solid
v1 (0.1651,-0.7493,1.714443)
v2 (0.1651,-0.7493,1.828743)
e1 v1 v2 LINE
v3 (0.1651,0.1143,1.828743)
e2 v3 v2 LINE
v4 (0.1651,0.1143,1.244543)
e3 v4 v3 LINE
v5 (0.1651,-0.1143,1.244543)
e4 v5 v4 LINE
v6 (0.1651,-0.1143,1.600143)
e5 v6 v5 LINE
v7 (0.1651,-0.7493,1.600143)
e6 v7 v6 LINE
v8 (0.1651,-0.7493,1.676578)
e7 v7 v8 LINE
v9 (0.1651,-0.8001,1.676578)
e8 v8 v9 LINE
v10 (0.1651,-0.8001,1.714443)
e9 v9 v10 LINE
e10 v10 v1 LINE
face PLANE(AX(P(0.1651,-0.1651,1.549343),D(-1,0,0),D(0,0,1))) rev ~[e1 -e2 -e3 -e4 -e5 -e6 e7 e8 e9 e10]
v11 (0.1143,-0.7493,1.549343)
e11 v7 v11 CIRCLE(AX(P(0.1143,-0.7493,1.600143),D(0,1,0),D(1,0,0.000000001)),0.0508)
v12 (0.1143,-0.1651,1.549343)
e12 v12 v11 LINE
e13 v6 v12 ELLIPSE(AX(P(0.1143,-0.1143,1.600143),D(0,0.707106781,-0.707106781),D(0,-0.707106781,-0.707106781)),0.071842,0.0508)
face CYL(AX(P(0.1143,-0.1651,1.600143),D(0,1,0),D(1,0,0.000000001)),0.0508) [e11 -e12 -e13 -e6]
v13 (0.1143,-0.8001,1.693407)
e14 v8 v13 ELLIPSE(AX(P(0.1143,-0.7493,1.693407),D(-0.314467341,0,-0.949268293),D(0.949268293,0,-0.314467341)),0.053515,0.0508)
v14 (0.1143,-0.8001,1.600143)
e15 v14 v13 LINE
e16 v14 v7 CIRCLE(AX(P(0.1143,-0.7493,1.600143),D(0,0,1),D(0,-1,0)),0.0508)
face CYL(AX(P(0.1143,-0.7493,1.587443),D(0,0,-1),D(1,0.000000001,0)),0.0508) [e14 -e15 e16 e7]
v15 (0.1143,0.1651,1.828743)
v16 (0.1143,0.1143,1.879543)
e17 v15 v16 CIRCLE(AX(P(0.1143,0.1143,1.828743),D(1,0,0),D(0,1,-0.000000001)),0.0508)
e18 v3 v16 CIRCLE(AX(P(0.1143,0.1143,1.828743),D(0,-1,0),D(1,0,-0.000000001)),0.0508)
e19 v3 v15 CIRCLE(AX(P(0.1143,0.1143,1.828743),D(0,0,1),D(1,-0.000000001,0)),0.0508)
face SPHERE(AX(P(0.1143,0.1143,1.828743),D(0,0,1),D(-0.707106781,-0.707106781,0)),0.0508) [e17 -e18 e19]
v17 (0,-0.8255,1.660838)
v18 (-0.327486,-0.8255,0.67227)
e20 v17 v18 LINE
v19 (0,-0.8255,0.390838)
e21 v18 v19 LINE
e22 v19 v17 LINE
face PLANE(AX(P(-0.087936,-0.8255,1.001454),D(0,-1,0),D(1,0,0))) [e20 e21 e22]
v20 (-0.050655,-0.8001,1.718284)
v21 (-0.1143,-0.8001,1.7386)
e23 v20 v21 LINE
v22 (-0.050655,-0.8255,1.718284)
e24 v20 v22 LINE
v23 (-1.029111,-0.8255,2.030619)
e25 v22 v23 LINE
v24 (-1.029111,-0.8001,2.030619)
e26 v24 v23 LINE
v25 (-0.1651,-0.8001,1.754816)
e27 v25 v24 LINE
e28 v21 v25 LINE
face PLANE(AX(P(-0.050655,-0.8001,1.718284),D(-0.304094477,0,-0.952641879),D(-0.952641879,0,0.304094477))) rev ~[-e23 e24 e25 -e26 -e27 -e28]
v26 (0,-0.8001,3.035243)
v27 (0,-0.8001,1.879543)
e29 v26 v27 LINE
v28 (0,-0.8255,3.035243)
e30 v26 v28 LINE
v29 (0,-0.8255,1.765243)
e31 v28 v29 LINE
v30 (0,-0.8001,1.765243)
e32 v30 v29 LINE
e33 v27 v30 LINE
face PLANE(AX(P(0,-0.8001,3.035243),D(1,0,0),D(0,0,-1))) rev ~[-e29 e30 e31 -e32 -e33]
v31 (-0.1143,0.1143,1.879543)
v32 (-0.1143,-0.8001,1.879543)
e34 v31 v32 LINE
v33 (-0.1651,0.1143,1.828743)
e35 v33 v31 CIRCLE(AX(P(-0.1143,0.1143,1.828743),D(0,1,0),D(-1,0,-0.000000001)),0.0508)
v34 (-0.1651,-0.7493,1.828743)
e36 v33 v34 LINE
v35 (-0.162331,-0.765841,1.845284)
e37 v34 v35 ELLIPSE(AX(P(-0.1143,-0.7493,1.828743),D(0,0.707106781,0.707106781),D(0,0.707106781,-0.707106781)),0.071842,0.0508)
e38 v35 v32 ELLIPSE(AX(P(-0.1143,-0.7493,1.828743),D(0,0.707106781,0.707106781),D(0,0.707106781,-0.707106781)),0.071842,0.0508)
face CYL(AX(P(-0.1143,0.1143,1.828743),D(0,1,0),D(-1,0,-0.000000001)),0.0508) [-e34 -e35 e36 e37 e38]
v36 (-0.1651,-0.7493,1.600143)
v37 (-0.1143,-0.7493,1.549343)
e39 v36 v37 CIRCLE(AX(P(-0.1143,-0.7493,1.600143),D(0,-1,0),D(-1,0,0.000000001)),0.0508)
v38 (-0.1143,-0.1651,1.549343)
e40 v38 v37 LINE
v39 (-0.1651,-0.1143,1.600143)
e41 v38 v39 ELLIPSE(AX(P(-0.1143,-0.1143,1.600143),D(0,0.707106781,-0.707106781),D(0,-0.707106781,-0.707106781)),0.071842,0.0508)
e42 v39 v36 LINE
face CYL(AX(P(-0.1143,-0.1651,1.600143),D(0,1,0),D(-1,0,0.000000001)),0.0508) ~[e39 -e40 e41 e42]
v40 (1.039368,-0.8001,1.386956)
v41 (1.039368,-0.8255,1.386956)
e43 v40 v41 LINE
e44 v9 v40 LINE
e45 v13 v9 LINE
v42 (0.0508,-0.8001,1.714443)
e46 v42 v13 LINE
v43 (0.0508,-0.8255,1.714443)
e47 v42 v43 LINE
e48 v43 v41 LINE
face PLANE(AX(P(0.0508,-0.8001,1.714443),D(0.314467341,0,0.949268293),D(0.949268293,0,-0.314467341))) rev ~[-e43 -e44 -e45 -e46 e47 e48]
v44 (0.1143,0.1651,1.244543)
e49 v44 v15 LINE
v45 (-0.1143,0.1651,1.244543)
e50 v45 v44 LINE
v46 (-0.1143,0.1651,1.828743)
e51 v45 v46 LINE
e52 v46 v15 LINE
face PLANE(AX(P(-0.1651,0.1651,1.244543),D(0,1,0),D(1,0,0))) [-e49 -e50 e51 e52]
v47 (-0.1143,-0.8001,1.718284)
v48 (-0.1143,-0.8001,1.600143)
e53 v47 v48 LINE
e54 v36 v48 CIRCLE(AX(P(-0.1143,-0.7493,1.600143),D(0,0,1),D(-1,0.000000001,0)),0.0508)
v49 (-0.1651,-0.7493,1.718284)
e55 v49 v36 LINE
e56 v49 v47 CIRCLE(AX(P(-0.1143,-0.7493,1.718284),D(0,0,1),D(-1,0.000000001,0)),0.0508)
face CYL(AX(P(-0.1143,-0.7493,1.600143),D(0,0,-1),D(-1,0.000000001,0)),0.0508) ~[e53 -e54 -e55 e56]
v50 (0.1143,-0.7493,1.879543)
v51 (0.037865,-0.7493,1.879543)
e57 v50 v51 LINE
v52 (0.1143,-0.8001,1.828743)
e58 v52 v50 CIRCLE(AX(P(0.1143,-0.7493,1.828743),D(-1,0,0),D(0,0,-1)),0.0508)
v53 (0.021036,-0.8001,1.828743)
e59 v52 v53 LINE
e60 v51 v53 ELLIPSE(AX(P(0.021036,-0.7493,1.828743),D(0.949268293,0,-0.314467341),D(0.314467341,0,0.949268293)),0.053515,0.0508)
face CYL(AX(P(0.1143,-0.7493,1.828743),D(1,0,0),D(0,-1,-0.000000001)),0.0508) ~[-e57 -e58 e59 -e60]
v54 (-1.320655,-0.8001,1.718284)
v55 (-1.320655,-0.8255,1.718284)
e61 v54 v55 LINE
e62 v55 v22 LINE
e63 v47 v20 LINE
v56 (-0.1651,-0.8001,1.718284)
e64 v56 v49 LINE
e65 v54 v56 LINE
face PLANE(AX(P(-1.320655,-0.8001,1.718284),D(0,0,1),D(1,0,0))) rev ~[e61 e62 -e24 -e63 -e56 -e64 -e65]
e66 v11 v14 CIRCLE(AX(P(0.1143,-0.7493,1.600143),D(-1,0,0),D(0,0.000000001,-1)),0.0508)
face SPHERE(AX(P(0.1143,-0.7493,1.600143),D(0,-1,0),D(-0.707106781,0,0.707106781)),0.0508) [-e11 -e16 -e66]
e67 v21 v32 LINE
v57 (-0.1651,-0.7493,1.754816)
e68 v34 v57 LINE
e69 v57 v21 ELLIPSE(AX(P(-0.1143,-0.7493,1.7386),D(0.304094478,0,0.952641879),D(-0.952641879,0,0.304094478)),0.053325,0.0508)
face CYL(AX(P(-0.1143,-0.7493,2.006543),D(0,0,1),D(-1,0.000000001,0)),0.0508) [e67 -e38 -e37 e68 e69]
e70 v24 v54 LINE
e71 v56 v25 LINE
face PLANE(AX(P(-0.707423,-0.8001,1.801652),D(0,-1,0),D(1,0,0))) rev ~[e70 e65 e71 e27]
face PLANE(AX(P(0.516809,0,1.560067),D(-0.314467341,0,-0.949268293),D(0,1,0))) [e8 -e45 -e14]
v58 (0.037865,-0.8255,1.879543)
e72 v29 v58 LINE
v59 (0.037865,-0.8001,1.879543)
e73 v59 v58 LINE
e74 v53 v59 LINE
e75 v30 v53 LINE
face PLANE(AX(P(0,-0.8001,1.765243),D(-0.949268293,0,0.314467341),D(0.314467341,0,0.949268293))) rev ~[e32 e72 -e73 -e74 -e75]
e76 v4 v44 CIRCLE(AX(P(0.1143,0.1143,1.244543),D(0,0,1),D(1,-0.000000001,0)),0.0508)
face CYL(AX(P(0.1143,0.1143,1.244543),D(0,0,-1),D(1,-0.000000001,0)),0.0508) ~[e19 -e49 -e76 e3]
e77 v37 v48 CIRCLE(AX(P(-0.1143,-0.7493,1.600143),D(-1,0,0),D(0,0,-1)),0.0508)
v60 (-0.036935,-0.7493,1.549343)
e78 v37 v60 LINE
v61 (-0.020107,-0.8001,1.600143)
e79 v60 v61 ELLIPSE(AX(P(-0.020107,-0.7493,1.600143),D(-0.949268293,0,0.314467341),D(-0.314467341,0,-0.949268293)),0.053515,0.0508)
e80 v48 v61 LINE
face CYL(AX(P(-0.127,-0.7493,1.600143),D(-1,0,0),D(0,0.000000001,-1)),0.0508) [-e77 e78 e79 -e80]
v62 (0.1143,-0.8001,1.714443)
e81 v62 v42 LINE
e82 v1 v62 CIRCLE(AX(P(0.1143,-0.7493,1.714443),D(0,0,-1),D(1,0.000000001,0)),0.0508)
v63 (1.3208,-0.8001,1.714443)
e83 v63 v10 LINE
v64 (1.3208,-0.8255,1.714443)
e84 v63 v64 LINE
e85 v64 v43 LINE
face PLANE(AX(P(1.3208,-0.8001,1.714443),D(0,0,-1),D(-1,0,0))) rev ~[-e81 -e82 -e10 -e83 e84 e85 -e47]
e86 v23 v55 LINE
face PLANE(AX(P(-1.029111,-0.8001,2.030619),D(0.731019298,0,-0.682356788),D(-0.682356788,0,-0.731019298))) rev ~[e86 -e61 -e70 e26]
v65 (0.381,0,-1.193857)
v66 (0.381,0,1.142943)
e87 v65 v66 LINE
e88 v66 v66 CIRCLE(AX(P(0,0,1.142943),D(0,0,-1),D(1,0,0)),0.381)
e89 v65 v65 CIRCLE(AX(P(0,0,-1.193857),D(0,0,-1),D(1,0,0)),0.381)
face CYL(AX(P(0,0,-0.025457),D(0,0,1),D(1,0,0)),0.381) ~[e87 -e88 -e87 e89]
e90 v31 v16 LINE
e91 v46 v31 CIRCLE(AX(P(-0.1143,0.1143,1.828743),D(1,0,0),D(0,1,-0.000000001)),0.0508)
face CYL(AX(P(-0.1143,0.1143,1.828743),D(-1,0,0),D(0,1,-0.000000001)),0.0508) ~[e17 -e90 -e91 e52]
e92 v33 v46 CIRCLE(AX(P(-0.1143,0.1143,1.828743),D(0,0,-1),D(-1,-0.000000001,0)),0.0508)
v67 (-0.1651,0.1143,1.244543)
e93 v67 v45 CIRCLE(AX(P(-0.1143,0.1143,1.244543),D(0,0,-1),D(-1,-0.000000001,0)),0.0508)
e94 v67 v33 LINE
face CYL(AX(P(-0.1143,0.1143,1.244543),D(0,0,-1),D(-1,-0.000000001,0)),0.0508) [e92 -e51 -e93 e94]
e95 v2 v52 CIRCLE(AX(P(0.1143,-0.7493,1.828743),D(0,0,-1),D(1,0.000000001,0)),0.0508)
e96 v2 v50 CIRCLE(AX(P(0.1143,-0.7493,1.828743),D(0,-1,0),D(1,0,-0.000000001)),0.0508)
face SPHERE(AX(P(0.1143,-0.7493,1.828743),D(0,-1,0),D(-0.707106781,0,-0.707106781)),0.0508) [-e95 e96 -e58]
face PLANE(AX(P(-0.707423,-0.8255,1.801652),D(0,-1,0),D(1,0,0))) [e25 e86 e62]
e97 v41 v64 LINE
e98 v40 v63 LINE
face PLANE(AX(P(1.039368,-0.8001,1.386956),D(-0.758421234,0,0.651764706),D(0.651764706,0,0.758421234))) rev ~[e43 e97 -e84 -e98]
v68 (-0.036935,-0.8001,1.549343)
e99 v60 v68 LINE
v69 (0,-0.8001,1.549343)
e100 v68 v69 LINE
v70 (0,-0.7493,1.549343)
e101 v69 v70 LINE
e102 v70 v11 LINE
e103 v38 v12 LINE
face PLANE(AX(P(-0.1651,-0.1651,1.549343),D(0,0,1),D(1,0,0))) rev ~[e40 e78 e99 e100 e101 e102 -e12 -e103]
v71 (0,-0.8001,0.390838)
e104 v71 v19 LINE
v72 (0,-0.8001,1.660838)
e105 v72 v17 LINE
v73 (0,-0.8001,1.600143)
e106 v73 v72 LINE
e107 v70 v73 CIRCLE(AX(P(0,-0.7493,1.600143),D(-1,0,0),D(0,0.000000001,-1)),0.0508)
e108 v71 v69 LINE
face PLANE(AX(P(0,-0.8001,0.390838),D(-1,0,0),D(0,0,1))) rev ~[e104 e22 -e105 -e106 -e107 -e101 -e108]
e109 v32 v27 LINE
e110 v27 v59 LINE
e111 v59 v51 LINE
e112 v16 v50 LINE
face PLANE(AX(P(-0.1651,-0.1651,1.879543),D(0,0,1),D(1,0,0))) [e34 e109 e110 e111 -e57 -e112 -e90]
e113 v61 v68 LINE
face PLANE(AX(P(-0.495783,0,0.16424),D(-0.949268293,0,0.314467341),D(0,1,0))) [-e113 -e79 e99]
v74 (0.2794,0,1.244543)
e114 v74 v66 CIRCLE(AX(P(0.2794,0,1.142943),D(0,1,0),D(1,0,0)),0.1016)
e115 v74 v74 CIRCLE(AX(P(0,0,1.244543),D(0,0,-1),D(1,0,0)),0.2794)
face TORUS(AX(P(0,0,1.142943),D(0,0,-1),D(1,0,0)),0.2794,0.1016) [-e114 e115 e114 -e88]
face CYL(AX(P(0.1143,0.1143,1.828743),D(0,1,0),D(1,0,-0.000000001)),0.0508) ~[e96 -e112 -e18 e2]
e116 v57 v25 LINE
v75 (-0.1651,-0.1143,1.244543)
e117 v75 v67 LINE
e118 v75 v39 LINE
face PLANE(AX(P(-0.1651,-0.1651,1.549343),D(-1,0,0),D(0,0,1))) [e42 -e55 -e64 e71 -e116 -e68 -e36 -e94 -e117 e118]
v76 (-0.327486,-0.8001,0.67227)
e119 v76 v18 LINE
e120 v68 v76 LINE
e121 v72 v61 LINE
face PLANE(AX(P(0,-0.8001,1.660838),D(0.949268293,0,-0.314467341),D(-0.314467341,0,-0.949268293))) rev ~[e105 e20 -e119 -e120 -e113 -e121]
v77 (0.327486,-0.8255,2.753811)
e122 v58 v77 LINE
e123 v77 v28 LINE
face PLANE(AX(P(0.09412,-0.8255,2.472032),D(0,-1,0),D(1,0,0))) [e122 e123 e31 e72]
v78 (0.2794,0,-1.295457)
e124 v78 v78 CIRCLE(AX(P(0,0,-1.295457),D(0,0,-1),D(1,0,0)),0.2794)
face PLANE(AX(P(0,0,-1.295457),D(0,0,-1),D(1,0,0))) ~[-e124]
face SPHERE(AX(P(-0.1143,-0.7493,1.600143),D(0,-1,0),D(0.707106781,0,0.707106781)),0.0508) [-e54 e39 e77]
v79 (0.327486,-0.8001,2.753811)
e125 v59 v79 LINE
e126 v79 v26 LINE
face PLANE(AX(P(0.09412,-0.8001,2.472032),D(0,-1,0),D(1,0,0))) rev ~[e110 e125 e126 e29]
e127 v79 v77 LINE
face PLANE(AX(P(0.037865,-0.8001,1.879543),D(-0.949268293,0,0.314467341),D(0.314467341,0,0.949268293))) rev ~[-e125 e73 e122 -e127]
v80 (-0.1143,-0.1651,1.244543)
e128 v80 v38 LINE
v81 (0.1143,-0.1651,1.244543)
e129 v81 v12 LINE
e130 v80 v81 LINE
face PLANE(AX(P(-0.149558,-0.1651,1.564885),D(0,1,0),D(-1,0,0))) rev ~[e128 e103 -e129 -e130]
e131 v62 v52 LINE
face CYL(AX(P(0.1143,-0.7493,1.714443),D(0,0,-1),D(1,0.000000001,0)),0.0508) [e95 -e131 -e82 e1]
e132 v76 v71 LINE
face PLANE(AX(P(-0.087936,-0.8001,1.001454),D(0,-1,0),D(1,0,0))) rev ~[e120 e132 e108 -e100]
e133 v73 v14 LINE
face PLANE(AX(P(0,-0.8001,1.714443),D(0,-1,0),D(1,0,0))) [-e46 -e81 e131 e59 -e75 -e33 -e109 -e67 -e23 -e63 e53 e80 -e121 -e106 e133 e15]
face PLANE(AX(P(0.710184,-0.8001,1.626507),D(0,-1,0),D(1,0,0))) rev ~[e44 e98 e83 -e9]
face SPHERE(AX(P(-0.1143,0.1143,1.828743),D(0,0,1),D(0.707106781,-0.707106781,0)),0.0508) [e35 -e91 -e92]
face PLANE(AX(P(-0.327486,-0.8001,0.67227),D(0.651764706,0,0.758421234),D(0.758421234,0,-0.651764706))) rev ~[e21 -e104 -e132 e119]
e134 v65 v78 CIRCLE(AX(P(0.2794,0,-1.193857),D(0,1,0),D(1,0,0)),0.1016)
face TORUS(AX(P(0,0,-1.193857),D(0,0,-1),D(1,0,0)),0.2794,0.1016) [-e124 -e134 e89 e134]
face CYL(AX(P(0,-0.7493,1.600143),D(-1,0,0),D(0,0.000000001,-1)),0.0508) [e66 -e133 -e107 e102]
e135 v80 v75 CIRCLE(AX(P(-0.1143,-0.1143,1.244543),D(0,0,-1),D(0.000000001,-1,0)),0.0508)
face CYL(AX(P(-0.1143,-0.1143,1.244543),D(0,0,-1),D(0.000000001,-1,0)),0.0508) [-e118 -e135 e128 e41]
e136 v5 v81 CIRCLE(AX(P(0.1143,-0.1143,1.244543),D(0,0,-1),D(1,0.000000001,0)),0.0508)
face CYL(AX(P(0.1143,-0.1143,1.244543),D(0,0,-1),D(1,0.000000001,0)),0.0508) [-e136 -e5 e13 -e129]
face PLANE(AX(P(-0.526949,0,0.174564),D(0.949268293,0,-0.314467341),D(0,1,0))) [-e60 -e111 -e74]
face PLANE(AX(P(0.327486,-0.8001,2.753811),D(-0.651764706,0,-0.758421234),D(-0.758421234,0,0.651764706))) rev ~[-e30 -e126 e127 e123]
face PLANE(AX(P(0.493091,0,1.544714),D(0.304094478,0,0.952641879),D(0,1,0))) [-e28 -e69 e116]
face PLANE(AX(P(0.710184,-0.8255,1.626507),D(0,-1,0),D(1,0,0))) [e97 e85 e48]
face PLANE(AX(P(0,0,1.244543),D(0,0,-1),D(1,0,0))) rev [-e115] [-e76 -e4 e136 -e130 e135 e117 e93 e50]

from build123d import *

# Parameters (mm, degrees)
F0_W           = 0.381
F0_H           = 2.54
F2_W           = 0.3302
F2_H           = 0.3302
F3_DEPTH       = 0.635
F4_W           = 0.3302
F4_H           = 0.3302
F5_DEPTH       = 0.635
F6_DEPTH       = 0.635
F8_DEPTH       = 0.0254
F9_DEPTH       = 0.0254
F11_DEPTH      = 0.0254
F13_DEPTH      = 0.0254
F15_DEPTH      = 0.0254
F16_T1_DEPTH   = 0.8636
F16_T3_DEPTH   = 0.5842
F16_T5_DEPTH   = 0.3048
F16_T7_DEPTH   = 0.5842
F16_T9_DEPTH   = 0.2286
F16_T11_DEPTH  = 1.0414
F16_T13_DEPTH  = 0.1181413534
F16_T15_DEPTH  = 0.1143
F16_T17_DEPTH  = 0.1143
F16_S21_W      = 0.051816
F16_S21_H      = 0.051816
F16_T22_DEPTH  = 0.051816
F16_S27_W      = 0.051816
F16_S27_H      = 0.051816
F16_T28_DEPTH  = 0.051816
F16_S33_W      = 0.051816
F16_S33_H      = 0.051816
F16_T34_DEPTH  = 0.051816
F16_S39_W      = 0.051816
F16_S39_H      = 0.051816
F16_T40_DEPTH  = 0.051816
F16_S45_W      = 0.051816
F16_S45_H      = 0.051816
F16_T46_DEPTH  = 0.051816
F16_T52_DEPTH  = 0.3787263164
F16_T57_DEPTH  = 0.3787263164
F16_T62_DEPTH  = 0.2451413534
F16_T67_DEPTH  = 0.2413
F16_T72_DEPTH  = 0.2043645658
F16_T77_DEPTH  = 0.2043645658
F16_T82_DEPTH  = 0.2413
F16_T87_DEPTH  = 0.2034354496
F16_T92_DEPTH  = 0.2034354496
F16_T97_DEPTH  = 0.2034354496
F16_T103_DEPTH = 0.4318
F16_T107_DEPTH = 0.7112
F16_T114_DEPTH = 0.4318
F16_T118_DEPTH = 0.7112
F17_R          = 0.1016


# Not quite as in the source:
# - a fillet or chamfer that OpenCascade refuses, or shapes differently, is made with other operations: its cross-section is extruded or revolved along the edge and cut away or added
# - a feature names something its author has since deleted; it is built from what else it names


with BuildPart() as f1:
    # F0 (on Front) → F1 (revolve)
    with BuildSketch(Plane.XZ):
        with Locations((0.1905, -0.0254572569)):
            Rectangle(F0_W, F0_H)
    revolve(axis=Axis((0, 0, -0.0254572569), (0, 0, -1)))

    # F2 (on face) → F3 (join)
    with BuildSketch(Plane.XY.offset(1.2445427431)):
        Rectangle(F2_W, F2_H)
    extrude(amount=F3_DEPTH)

    # F4 (on face) → F5 (join)
    with BuildSketch(Plane.XZ.offset(0.1651)):
        with Locations((0, 1.7144427431)):
            Rectangle(F4_W, F4_H)
    extrude(amount=F5_DEPTH)

    # F2 (on face) → F6 (join)
    with BuildSketch(Plane.XY.offset(1.2445427431)):
        Rectangle(F2_W, F2_H)
    extrude(amount=F6_DEPTH)

    # F7 (on face) → F8 (join)
    with BuildSketch(Plane.XZ.offset(0.8001)):
        Polygon((0, 3.0352427431), (0, 1.8795427431), (0.0378645504, 1.8795427431), (0.3274862888, 2.7538107431), align=None)
        Polygon((0, 1.8795427431), (0, 1.7652427431), (0.0378645504, 1.8795427431), align=None)
    extrude(amount=F8_DEPTH)

    # F7 (on face) → F9 (join)
    with BuildSketch(Plane.XZ.offset(0.8001)):
        Polygon((0, 3.0352427431), (0, 1.7652427431), (0.3274862888, 2.7538107431), align=None)
    extrude(amount=F9_DEPTH)

    # F10 (on face) → F11 (join)
    with BuildSketch(Plane.XZ.offset(0.8001)):
        Polygon((1.3208, 1.7144427431), (0.0508, 1.7144427431), (1.039368, 1.3869564543), align=None)
    extrude(amount=F11_DEPTH)

    # F12 (on face) → F13 (join)
    with BuildSketch(Plane.XZ.offset(0.8001)):
        Polygon((0, 0.3908380623), (0, 1.6608380623), (-0.3274862888, 0.6722700623), align=None)
    extrude(amount=F13_DEPTH)

    # F14 (on face) → F15 (join)
    with BuildSketch(Plane.XZ.offset(0.8001)):
        Polygon((-1.3206545556, 1.7182840966), (-0.0506545556, 1.7182840966), (-1.0291112121, 2.0306189544), align=None)
    extrude(amount=F15_DEPTH)

    # F16: fillet of radius 0.0508 on 16 edges, made by hand

    # F16_s2 → F16_t1 (cut)
    with BuildSketch(Plane.XZ.offset(-0.1143)):
        with BuildLine():
            ThreePointArc((0.1651, 1.8287427431), (0.1502210245, 1.8646637676), (0.1143, 1.8795427431))
            Line((0.1143, 1.8795427431), (0.1651, 1.8795427431))
            Line((0.1651, 1.8795427431), (0.1651, 1.8287427431))
        make_face()
    extrude(amount=F16_T1_DEPTH, mode=Mode.SUBTRACT)

    # F16_s4 → F16_t3 (cut)
    with BuildSketch(Plane.XZ.offset(0.1651)):
        with BuildLine():
            ThreePointArc((0.1651, 1.6001427431), (0.1502210245, 1.5642217186), (0.1143, 1.5493427431))
            Line((0.1143, 1.5493427431), (0.1651, 1.5493427431))
            Line((0.1651, 1.5493427431), (0.1651, 1.6001427431))
        make_face()
        with BuildLine():
            ThreePointArc((-0.1651, 1.6001427431), (-0.1502210245, 1.5642217186), (-0.1143, 1.5493427431))
            Line((-0.1143, 1.5493427431), (-0.1651, 1.5493427431))
            Line((-0.1651, 1.5493427431), (-0.1651, 1.6001427431))
        make_face()
    extrude(amount=F16_T3_DEPTH, mode=Mode.SUBTRACT)

    # F16_s6 → F16_t5 (cut)
    with BuildSketch(Plane.XY.offset(1.2445427431)):
        with BuildLine():
            ThreePointArc((0.1651, -0.1143), (0.1502210245, -0.1502210245), (0.1143, -0.1651))
            Line((0.1143, -0.1651), (0.1651, -0.1651))
            Line((0.1651, -0.1651), (0.1651, -0.1143))
        make_face()
        with BuildLine():
            ThreePointArc((-0.1143, -0.1651), (-0.1502210245, -0.1502210245), (-0.1651, -0.1143))
            Line((-0.1651, -0.1143), (-0.1651, -0.1651))
            Line((-0.1651, -0.1651), (-0.1143, -0.1651))
        make_face()
    extrude(amount=F16_T5_DEPTH, mode=Mode.SUBTRACT)

    # F16_s8 → F16_t7 (cut)
    with BuildSketch(Plane.XY.offset(1.2445427431)):
        with BuildLine():
            ThreePointArc((0.1651, 0.1143), (0.1502210245, 0.1502210245), (0.1143, 0.1651))
            Line((0.1143, 0.1651), (0.1651, 0.1651))
            Line((0.1651, 0.1651), (0.1651, 0.1143))
        make_face()
        with BuildLine():
            ThreePointArc((-0.1651, 0.1143), (-0.1502210245, 0.1502210245), (-0.1143, 0.1651))
            Line((-0.1143, 0.1651), (-0.1651, 0.1651))
            Line((-0.1651, 0.1651), (-0.1651, 0.1143))
        make_face()
    extrude(amount=F16_T7_DEPTH, mode=Mode.SUBTRACT)

    # F16_s10 → F16_t9 (cut)
    with BuildSketch(Plane.YZ.offset(-0.1143)):
        with BuildLine():
            ThreePointArc((0.1651, 1.8287427431), (0.1502210245, 1.8646637676), (0.1143, 1.8795427431))
            Line((0.1143, 1.8795427431), (0.1651, 1.8795427431))
            Line((0.1651, 1.8795427431), (0.1651, 1.8287427431))
        make_face()
    extrude(amount=F16_T9_DEPTH, mode=Mode.SUBTRACT)

    # F16_s12 → F16_t11 (cut)
    with BuildSketch(Plane.XZ.offset(-0.1143)):
        with BuildLine():
            ThreePointArc((-0.1651, 1.8287427431), (-0.1502210245, 1.8646637676), (-0.1143, 1.8795427431))
            Line((-0.1143, 1.8795427431), (-0.1651, 1.8795427431))
            Line((-0.1651, 1.8795427431), (-0.1651, 1.8287427431))
        make_face()
    extrude(amount=F16_T11_DEPTH, mode=Mode.SUBTRACT)

    # F16_s14 → F16_t13 (cut)
    with BuildSketch(Plane.XY.offset(1.6001427431)):
        with BuildLine():
            ThreePointArc((-0.1651, -0.7493), (-0.1502210245, -0.7852210245), (-0.1143, -0.8001))
            Line((-0.1143, -0.8001), (-0.1651, -0.8001))
            Line((-0.1651, -0.8001), (-0.1651, -0.7493))
        make_face()
    extrude(amount=F16_T13_DEPTH, mode=Mode.SUBTRACT)

    # F16_s16 → F16_t15 (cut)
    with BuildSketch(Plane.YZ):
        with BuildLine():
            ThreePointArc((-0.7493, 1.5493427431), (-0.7852210245, 1.5642217186), (-0.8001, 1.6001427431))
            Line((-0.8001, 1.6001427431), (-0.8001, 1.5493427431))
            Line((-0.8001, 1.5493427431), (-0.7493, 1.5493427431))
        make_face()
    extrude(amount=F16_T15_DEPTH, mode=Mode.SUBTRACT)

    # F16_s18 → F16_t17 (cut)
    with BuildSketch(Plane.XY.offset(1.7144427431)):
        with BuildLine():
            ThreePointArc((0.1651, -0.7493), (0.1502210245, -0.7852210245), (0.1143, -0.8001))
            Line((0.1143, -0.8001), (0.1651, -0.8001))
            Line((0.1651, -0.8001), (0.1651, -0.7493))
        make_face()
    extrude(amount=F16_T17_DEPTH, mode=Mode.SUBTRACT)


with BuildPart() as f16_tool20:
    # F16_s21 → F16_t22 (new body)
    with BuildSketch(Plane.XY.offset(1.8287427431)):
        with Locations((0.140208, 0.140208)):
            Rectangle(F16_S21_W, F16_S21_H)
    extrude(amount=F16_T22_DEPTH)

    # F16_s23 → F16_t24 (revolve, cut)
    with BuildSketch(Plane(origin=(0.1143, 0.1143, 1.8287427431), x_dir=(-0.7071067812, -0.7071067812, 0), z_dir=(-0.7071067812, 0.7071067812, 0))):
        with BuildLine():
            ThreePointArc((0, -0.0508), (0.0508, 0), (0, 0.0508))
            Line((0, 0.0508), (0, -0.0508))
        make_face()
    revolve(axis=Axis((0.1143, 0.1143, 1.8287427431), (0, 0, 1)), mode=Mode.SUBTRACT)


with BuildPart() as f1_1:
    add(f1.part)

    # F16_t19: cut F16_tool20
    add(f16_tool20.part, mode=Mode.SUBTRACT)


with BuildPart() as f16_tool26:
    # F16_s27 → F16_t28 (new body)
    with BuildSketch(Plane.XZ.offset(0.7493)):
        with Locations((0.140208, 1.8546507431)):
            Rectangle(F16_S27_W, F16_S27_H)
    extrude(amount=F16_T28_DEPTH)

    # F16_s29 → F16_t30 (revolve, cut)
    with BuildSketch(Plane(origin=(0.1143, -0.7493, 1.8287427431), x_dir=(-0.7071067812, 0, -0.7071067812), z_dir=(-0.7071067812, 0, 0.7071067812))):
        with BuildLine():
            ThreePointArc((0, -0.0508), (0.0508, 0), (0, 0.0508))
            Line((0, 0.0508), (0, -0.0508))
        make_face()
    revolve(axis=Axis((0.1143, -0.7493, 1.8287427431), (0, -1, 0)), mode=Mode.SUBTRACT)


with BuildPart() as f1_2:
    add(f1_1.part)

    # F16_t25: cut F16_tool26
    add(f16_tool26.part, mode=Mode.SUBTRACT)


with BuildPart() as f16_tool32:
    # F16_s33 → F16_t34 (new body)
    with BuildSketch(Plane.XZ.offset(0.7493)):
        with Locations((0.140208, 1.5742347431)):
            Rectangle(F16_S33_W, F16_S33_H)
    extrude(amount=F16_T34_DEPTH)

    # F16_s35 → F16_t36 (revolve, cut)
    with BuildSketch(Plane(origin=(0.1143, -0.7493, 1.6001427431), x_dir=(-0.7071067812, 0, 0.7071067812), z_dir=(0.7071067812, 0, 0.7071067812))):
        with BuildLine():
            ThreePointArc((0, -0.0508), (0.0508, 0), (0, 0.0508))
            Line((0, 0.0508), (0, -0.0508))
        make_face()
    revolve(axis=Axis((0.1143, -0.7493, 1.6001427431), (0, -1, 0)), mode=Mode.SUBTRACT)


with BuildPart() as f1_3:
    add(f1_2.part)

    # F16_t31: cut F16_tool32
    add(f16_tool32.part, mode=Mode.SUBTRACT)


with BuildPart() as f16_tool38:
    # F16_s39 → F16_t40 (new body)
    with BuildSketch(Plane.XY.offset(1.8287427431)):
        with Locations((-0.140208, 0.140208)):
            Rectangle(F16_S39_W, F16_S39_H)
    extrude(amount=F16_T40_DEPTH)

    # F16_s41 → F16_t42 (revolve, cut)
    with BuildSketch(Plane(origin=(-0.1143, 0.1143, 1.8287427431), x_dir=(0.7071067812, -0.7071067812, 0), z_dir=(-0.7071067812, -0.7071067812, 0))):
        with BuildLine():
            ThreePointArc((0, -0.0508), (0.0508, 0), (0, 0.0508))
            Line((0, 0.0508), (0, -0.0508))
        make_face()
    revolve(axis=Axis((-0.1143, 0.1143, 1.8287427431), (0, 0, 1)), mode=Mode.SUBTRACT)


with BuildPart() as f1_4:
    add(f1_3.part)

    # F16_t37: cut F16_tool38
    add(f16_tool38.part, mode=Mode.SUBTRACT)


with BuildPart() as f16_tool44:
    # F16_s45 → F16_t46 (new body)
    with BuildSketch(Plane.XZ.offset(0.7493)):
        with Locations((-0.140208, 1.5742347431)):
            Rectangle(F16_S45_W, F16_S45_H)
    extrude(amount=F16_T46_DEPTH)

    # F16_s47 → F16_t48 (revolve, cut)
    with BuildSketch(Plane(origin=(-0.1143, -0.7493, 1.6001427431), x_dir=(0.7071067812, 0, 0.7071067812), z_dir=(0.7071067812, 0, -0.7071067812))):
        with BuildLine():
            ThreePointArc((0, -0.0508), (0.0508, 0), (0, 0.0508))
            Line((0, 0.0508), (0, -0.0508))
        make_face()
    revolve(axis=Axis((-0.1143, -0.7493, 1.6001427431), (0, -1, 0)), mode=Mode.SUBTRACT)


with BuildPart() as f1_5:
    add(f1_4.part)

    # F16_t43: cut F16_tool44
    add(f16_tool44.part, mode=Mode.SUBTRACT)


with BuildPart() as f16_tool50:
    # F16_s51 → F16_t52 (new body)
    with BuildSketch(Plane.XY.offset(2.0065427431)):
        with BuildLine():
            ThreePointArc((-0.1651, -0.7493), (-0.1502210245, -0.7852210245), (-0.1143, -0.8001))
            Line((-0.1143, -0.8001), (-0.1651, -0.8001))
            Line((-0.1651, -0.8001), (-0.1651, -0.7493))
        make_face()
    extrude(amount=-F16_T52_DEPTH)

    split(bisect_by=Plane(origin=(0.493090904, 0, 1.5447141589), x_dir=(0, 1, 0), z_dir=(0.3040944775, 0, 0.9526418785)), keep=Keep.TOP)


with BuildPart() as f1_6:
    add(f1_5.part)

    # F16_t49: cut F16_tool50
    add(f16_tool50.part, mode=Mode.SUBTRACT)


with BuildPart() as f16_tool55:
    # F16_s56 → F16_t57 (new body)
    with BuildSketch(Plane.XY.offset(2.0065427431)):
        with BuildLine():
            ThreePointArc((-0.1651, -0.7493), (-0.1502210245, -0.7852210245), (-0.1143, -0.8001))
            Line((-0.1143, -0.8001), (-0.1651, -0.8001))
            Line((-0.1651, -0.8001), (-0.1651, -0.7493))
        make_face()
    extrude(amount=-F16_T57_DEPTH)

    split(bisect_by=Plane.XY.offset(1.7182840966), keep=Keep.BOTTOM)


with BuildPart() as f1_7:
    add(f1_6.part)

    # F16_t54: cut F16_tool55
    add(f16_tool55.part, mode=Mode.SUBTRACT)


with BuildPart() as f16_tool60:
    # F16_s61 → F16_t62 (new body)
    with BuildSketch(Plane.XY.offset(1.8452840966)):
        with BuildLine():
            ThreePointArc((-0.1651, -0.7493), (-0.1502210245, -0.7852210245), (-0.1143, -0.8001))
            Line((-0.1143, -0.8001), (-0.1651, -0.8001))
            Line((-0.1651, -0.8001), (-0.1651, -0.7493))
        make_face()
    extrude(amount=-F16_T62_DEPTH)

    split(bisect_by=Plane(origin=(0.493090904, 0, 1.5447141589), x_dir=(0, 1, 0), z_dir=(0.3040944775, 0, 0.9526418785)), keep=Keep.TOP)


with BuildPart() as f1_8:
    add(f1_7.part)

    # F16_t59: cut F16_tool60
    add(f16_tool60.part, mode=Mode.SUBTRACT)


with BuildPart() as f16_tool65:
    # F16_s66 → F16_t67 (new body)
    with BuildSketch(Plane.YZ.offset(-0.127)):
        with BuildLine():
            ThreePointArc((-0.7493, 1.5493427431), (-0.7852210245, 1.5642217186), (-0.8001, 1.6001427431))
            Line((-0.8001, 1.6001427431), (-0.8001, 1.5493427431))
            Line((-0.8001, 1.5493427431), (-0.7493, 1.5493427431))
        make_face()
    extrude(amount=F16_T67_DEPTH)

    split(bisect_by=Plane(origin=(-0.4957832071, 0, 0.1642397919), x_dir=(0, 1, 0), z_dir=(-0.9492682927, 0, 0.3144673409)), keep=Keep.TOP)


with BuildPart() as f1_9:
    add(f1_8.part)

    # F16_t64: cut F16_tool65
    add(f16_tool65.part, mode=Mode.SUBTRACT)


with BuildPart() as f16_tool70:
    # F16_s71 → F16_t72 (new body)
    with BuildSketch(Plane.YZ.offset(-0.1143)):
        with BuildLine():
            ThreePointArc((-0.7493, 1.5493427431), (-0.7852210245, 1.5642217186), (-0.8001, 1.6001427431))
            Line((-0.8001, 1.6001427431), (-0.8001, 1.5493427431))
            Line((-0.8001, 1.5493427431), (-0.7493, 1.5493427431))
        make_face()
    extrude(amount=F16_T72_DEPTH)

    split(bisect_by=Plane(origin=(-0.4957832071, 0, 0.1642397919), x_dir=(0, 1, 0), z_dir=(-0.9492682927, 0, 0.3144673409)), keep=Keep.TOP)


with BuildPart() as f1_10:
    add(f1_9.part)

    # F16_t69: cut F16_tool70
    add(f16_tool70.part, mode=Mode.SUBTRACT)


with BuildPart() as f16_tool75:
    # F16_s76 → F16_t77 (new body)
    with BuildSketch(Plane.YZ.offset(-0.1143)):
        with BuildLine():
            ThreePointArc((-0.7493, 1.5493427431), (-0.7852210245, 1.5642217186), (-0.8001, 1.6001427431))
            Line((-0.8001, 1.6001427431), (-0.8001, 1.5493427431))
            Line((-0.8001, 1.5493427431), (-0.7493, 1.5493427431))
        make_face()
    extrude(amount=F16_T77_DEPTH)

    split(bisect_by=Plane.YZ, keep=Keep.TOP)


with BuildPart() as f1_11:
    add(f1_10.part)

    # F16_t74: cut F16_tool75
    add(f16_tool75.part, mode=Mode.SUBTRACT)


with BuildPart() as f16_tool80:
    # F16_s81 → F16_t82 (new body)
    with BuildSketch(Plane.XY.offset(1.5874427431)):
        with BuildLine():
            ThreePointArc((0.1651, -0.7493), (0.1502210245, -0.7852210245), (0.1143, -0.8001))
            Line((0.1143, -0.8001), (0.1651, -0.8001))
            Line((0.1651, -0.8001), (0.1651, -0.7493))
        make_face()
    extrude(amount=F16_T82_DEPTH)

    split(bisect_by=Plane(origin=(0.5168085453, 0, 1.5600665049), x_dir=(0, 1, 0), z_dir=(-0.3144673409, 0, -0.9492682927)), keep=Keep.TOP)


with BuildPart() as f1_12:
    add(f1_11.part)

    # F16_t79: cut F16_tool80
    add(f16_tool80.part, mode=Mode.SUBTRACT)


with BuildPart() as f16_tool85:
    # F16_s86 → F16_t87 (new body)
    with BuildSketch(Plane.XY.offset(1.6001427431)):
        with BuildLine():
            ThreePointArc((0.1651, -0.7493), (0.1502210245, -0.7852210245), (0.1143, -0.8001))
            Line((0.1143, -0.8001), (0.1651, -0.8001))
            Line((0.1651, -0.8001), (0.1651, -0.7493))
        make_face()
    extrude(amount=F16_T87_DEPTH)

    split(bisect_by=Plane(origin=(0.5168085453, 0, 1.5600665049), x_dir=(0, 1, 0), z_dir=(-0.3144673409, 0, -0.9492682927)), keep=Keep.TOP)


with BuildPart() as f1_13:
    add(f1_12.part)

    # F16_t84: cut F16_tool85
    add(f16_tool85.part, mode=Mode.SUBTRACT)


with BuildPart() as f16_tool90:
    # F16_s91 → F16_t92 (new body)
    with BuildSketch(Plane.XY.offset(1.6001427431)):
        with BuildLine():
            ThreePointArc((0.1651, -0.7493), (0.1502210245, -0.7852210245), (0.1143, -0.8001))
            Line((0.1143, -0.8001), (0.1651, -0.8001))
            Line((0.1651, -0.8001), (0.1651, -0.7493))
        make_face()
    extrude(amount=F16_T92_DEPTH)

    split(bisect_by=Plane.XY.offset(1.7144427431), keep=Keep.TOP)


with BuildPart() as f1_14:
    add(f1_13.part)

    # F16_t89: cut F16_tool90
    add(f16_tool90.part, mode=Mode.SUBTRACT)


with BuildPart() as f16_tool95:
    # F16_s96 → F16_t97 (new body)
    with BuildSketch(Plane.YZ.offset(0.1143)):
        with BuildLine():
            ThreePointArc((-0.8001, 1.8287427431), (-0.7852210245, 1.8646637676), (-0.7493, 1.8795427431))
            Line((-0.7493, 1.8795427431), (-0.8001, 1.8795427431))
            Line((-0.8001, 1.8795427431), (-0.8001, 1.8287427431))
        make_face()
    extrude(amount=-F16_T97_DEPTH)

    split(bisect_by=Plane(origin=(-0.526949453, 0, 0.1745643403), x_dir=(0, 1, 0), z_dir=(0.9492682927, 0, -0.3144673409)), keep=Keep.TOP)


with BuildPart() as f1_15:
    add(f1_14.part)

    # F16_t94: cut F16_tool95
    add(f16_tool95.part, mode=Mode.SUBTRACT)


with BuildPart() as f16_tool101:
    # F16_s102 → F16_t103 (new body)
    with BuildSketch(Plane.XY.offset(1.2445427431)):
        with BuildLine():
            ThreePointArc((0.1651, -0.1143), (0.1502210245, -0.1502210245), (0.1143, -0.1651))
            Line((0.1143, -0.1651), (0.1651, -0.1651))
            Line((0.1651, -0.1651), (0.1651, -0.1143))
        make_face()
    extrude(amount=F16_T103_DEPTH)

    split(bisect_by=Plane.XY.offset(1.5493427431), keep=Keep.TOP)


with BuildPart() as f16_tool105:
    # F16_s106 → F16_t107 (new body)
    with BuildSketch(Plane.XZ.offset(0.0381)):
        with BuildLine():
            ThreePointArc((0.1651, 1.6001427431), (0.1502210245, 1.5642217186), (0.1143, 1.5493427431))
            Line((0.1143, 1.5493427431), (0.1651, 1.5493427431))
            Line((0.1651, 1.5493427431), (0.1651, 1.6001427431))
        make_face()
    extrude(amount=F16_T107_DEPTH)

    split(bisect_by=Plane.XZ.offset(0.1651), keep=Keep.BOTTOM)


with BuildPart() as f16_tool101_1:
    add(f16_tool101.part)

    # F16_t109: intersect F16_tool105
    add(f16_tool105.part, mode=Mode.INTERSECT)


with BuildPart() as f1_16:
    add(f1_15.part)

    # F16_t99: cut F16_tool101
    add(f16_tool101_1.part, mode=Mode.SUBTRACT)


with BuildPart() as f16_tool112:
    # F16_s113 → F16_t114 (new body)
    with BuildSketch(Plane.XY.offset(1.2445427431)):
        with BuildLine():
            ThreePointArc((-0.1143, -0.1651), (-0.1502210245, -0.1502210245), (-0.1651, -0.1143))
            Line((-0.1651, -0.1143), (-0.1651, -0.1651))
            Line((-0.1651, -0.1651), (-0.1143, -0.1651))
        make_face()
    extrude(amount=F16_T114_DEPTH)

    split(bisect_by=Plane.XY.offset(1.5493427431), keep=Keep.TOP)


with BuildPart() as f16_tool116:
    # F16_s117 → F16_t118 (new body)
    with BuildSketch(Plane.XZ.offset(0.0381)):
        with BuildLine():
            ThreePointArc((-0.1651, 1.6001427431), (-0.1502210245, 1.5642217186), (-0.1143, 1.5493427431))
            Line((-0.1143, 1.5493427431), (-0.1651, 1.5493427431))
            Line((-0.1651, 1.5493427431), (-0.1651, 1.6001427431))
        make_face()
    extrude(amount=F16_T118_DEPTH)

    split(bisect_by=Plane.XZ.offset(0.1651), keep=Keep.BOTTOM)


with BuildPart() as f16_tool112_1:
    add(f16_tool112.part)

    # F16_t120: intersect F16_tool116
    add(f16_tool116.part, mode=Mode.INTERSECT)


with BuildPart() as f1_17:
    add(f1_16.part)

    # F16_t110: cut F16_tool112
    add(f16_tool112_1.part, mode=Mode.SUBTRACT)

    # F17
    f17_edges = [f1_17.edges().sort_by_distance(p)[0] for p in [
        (-0.381, 0, 1.244543),
        (-0.381, 0, -1.295457),
    ]]
    fillet(f17_edges, radius=F17_R)


solid = f1_17.part
